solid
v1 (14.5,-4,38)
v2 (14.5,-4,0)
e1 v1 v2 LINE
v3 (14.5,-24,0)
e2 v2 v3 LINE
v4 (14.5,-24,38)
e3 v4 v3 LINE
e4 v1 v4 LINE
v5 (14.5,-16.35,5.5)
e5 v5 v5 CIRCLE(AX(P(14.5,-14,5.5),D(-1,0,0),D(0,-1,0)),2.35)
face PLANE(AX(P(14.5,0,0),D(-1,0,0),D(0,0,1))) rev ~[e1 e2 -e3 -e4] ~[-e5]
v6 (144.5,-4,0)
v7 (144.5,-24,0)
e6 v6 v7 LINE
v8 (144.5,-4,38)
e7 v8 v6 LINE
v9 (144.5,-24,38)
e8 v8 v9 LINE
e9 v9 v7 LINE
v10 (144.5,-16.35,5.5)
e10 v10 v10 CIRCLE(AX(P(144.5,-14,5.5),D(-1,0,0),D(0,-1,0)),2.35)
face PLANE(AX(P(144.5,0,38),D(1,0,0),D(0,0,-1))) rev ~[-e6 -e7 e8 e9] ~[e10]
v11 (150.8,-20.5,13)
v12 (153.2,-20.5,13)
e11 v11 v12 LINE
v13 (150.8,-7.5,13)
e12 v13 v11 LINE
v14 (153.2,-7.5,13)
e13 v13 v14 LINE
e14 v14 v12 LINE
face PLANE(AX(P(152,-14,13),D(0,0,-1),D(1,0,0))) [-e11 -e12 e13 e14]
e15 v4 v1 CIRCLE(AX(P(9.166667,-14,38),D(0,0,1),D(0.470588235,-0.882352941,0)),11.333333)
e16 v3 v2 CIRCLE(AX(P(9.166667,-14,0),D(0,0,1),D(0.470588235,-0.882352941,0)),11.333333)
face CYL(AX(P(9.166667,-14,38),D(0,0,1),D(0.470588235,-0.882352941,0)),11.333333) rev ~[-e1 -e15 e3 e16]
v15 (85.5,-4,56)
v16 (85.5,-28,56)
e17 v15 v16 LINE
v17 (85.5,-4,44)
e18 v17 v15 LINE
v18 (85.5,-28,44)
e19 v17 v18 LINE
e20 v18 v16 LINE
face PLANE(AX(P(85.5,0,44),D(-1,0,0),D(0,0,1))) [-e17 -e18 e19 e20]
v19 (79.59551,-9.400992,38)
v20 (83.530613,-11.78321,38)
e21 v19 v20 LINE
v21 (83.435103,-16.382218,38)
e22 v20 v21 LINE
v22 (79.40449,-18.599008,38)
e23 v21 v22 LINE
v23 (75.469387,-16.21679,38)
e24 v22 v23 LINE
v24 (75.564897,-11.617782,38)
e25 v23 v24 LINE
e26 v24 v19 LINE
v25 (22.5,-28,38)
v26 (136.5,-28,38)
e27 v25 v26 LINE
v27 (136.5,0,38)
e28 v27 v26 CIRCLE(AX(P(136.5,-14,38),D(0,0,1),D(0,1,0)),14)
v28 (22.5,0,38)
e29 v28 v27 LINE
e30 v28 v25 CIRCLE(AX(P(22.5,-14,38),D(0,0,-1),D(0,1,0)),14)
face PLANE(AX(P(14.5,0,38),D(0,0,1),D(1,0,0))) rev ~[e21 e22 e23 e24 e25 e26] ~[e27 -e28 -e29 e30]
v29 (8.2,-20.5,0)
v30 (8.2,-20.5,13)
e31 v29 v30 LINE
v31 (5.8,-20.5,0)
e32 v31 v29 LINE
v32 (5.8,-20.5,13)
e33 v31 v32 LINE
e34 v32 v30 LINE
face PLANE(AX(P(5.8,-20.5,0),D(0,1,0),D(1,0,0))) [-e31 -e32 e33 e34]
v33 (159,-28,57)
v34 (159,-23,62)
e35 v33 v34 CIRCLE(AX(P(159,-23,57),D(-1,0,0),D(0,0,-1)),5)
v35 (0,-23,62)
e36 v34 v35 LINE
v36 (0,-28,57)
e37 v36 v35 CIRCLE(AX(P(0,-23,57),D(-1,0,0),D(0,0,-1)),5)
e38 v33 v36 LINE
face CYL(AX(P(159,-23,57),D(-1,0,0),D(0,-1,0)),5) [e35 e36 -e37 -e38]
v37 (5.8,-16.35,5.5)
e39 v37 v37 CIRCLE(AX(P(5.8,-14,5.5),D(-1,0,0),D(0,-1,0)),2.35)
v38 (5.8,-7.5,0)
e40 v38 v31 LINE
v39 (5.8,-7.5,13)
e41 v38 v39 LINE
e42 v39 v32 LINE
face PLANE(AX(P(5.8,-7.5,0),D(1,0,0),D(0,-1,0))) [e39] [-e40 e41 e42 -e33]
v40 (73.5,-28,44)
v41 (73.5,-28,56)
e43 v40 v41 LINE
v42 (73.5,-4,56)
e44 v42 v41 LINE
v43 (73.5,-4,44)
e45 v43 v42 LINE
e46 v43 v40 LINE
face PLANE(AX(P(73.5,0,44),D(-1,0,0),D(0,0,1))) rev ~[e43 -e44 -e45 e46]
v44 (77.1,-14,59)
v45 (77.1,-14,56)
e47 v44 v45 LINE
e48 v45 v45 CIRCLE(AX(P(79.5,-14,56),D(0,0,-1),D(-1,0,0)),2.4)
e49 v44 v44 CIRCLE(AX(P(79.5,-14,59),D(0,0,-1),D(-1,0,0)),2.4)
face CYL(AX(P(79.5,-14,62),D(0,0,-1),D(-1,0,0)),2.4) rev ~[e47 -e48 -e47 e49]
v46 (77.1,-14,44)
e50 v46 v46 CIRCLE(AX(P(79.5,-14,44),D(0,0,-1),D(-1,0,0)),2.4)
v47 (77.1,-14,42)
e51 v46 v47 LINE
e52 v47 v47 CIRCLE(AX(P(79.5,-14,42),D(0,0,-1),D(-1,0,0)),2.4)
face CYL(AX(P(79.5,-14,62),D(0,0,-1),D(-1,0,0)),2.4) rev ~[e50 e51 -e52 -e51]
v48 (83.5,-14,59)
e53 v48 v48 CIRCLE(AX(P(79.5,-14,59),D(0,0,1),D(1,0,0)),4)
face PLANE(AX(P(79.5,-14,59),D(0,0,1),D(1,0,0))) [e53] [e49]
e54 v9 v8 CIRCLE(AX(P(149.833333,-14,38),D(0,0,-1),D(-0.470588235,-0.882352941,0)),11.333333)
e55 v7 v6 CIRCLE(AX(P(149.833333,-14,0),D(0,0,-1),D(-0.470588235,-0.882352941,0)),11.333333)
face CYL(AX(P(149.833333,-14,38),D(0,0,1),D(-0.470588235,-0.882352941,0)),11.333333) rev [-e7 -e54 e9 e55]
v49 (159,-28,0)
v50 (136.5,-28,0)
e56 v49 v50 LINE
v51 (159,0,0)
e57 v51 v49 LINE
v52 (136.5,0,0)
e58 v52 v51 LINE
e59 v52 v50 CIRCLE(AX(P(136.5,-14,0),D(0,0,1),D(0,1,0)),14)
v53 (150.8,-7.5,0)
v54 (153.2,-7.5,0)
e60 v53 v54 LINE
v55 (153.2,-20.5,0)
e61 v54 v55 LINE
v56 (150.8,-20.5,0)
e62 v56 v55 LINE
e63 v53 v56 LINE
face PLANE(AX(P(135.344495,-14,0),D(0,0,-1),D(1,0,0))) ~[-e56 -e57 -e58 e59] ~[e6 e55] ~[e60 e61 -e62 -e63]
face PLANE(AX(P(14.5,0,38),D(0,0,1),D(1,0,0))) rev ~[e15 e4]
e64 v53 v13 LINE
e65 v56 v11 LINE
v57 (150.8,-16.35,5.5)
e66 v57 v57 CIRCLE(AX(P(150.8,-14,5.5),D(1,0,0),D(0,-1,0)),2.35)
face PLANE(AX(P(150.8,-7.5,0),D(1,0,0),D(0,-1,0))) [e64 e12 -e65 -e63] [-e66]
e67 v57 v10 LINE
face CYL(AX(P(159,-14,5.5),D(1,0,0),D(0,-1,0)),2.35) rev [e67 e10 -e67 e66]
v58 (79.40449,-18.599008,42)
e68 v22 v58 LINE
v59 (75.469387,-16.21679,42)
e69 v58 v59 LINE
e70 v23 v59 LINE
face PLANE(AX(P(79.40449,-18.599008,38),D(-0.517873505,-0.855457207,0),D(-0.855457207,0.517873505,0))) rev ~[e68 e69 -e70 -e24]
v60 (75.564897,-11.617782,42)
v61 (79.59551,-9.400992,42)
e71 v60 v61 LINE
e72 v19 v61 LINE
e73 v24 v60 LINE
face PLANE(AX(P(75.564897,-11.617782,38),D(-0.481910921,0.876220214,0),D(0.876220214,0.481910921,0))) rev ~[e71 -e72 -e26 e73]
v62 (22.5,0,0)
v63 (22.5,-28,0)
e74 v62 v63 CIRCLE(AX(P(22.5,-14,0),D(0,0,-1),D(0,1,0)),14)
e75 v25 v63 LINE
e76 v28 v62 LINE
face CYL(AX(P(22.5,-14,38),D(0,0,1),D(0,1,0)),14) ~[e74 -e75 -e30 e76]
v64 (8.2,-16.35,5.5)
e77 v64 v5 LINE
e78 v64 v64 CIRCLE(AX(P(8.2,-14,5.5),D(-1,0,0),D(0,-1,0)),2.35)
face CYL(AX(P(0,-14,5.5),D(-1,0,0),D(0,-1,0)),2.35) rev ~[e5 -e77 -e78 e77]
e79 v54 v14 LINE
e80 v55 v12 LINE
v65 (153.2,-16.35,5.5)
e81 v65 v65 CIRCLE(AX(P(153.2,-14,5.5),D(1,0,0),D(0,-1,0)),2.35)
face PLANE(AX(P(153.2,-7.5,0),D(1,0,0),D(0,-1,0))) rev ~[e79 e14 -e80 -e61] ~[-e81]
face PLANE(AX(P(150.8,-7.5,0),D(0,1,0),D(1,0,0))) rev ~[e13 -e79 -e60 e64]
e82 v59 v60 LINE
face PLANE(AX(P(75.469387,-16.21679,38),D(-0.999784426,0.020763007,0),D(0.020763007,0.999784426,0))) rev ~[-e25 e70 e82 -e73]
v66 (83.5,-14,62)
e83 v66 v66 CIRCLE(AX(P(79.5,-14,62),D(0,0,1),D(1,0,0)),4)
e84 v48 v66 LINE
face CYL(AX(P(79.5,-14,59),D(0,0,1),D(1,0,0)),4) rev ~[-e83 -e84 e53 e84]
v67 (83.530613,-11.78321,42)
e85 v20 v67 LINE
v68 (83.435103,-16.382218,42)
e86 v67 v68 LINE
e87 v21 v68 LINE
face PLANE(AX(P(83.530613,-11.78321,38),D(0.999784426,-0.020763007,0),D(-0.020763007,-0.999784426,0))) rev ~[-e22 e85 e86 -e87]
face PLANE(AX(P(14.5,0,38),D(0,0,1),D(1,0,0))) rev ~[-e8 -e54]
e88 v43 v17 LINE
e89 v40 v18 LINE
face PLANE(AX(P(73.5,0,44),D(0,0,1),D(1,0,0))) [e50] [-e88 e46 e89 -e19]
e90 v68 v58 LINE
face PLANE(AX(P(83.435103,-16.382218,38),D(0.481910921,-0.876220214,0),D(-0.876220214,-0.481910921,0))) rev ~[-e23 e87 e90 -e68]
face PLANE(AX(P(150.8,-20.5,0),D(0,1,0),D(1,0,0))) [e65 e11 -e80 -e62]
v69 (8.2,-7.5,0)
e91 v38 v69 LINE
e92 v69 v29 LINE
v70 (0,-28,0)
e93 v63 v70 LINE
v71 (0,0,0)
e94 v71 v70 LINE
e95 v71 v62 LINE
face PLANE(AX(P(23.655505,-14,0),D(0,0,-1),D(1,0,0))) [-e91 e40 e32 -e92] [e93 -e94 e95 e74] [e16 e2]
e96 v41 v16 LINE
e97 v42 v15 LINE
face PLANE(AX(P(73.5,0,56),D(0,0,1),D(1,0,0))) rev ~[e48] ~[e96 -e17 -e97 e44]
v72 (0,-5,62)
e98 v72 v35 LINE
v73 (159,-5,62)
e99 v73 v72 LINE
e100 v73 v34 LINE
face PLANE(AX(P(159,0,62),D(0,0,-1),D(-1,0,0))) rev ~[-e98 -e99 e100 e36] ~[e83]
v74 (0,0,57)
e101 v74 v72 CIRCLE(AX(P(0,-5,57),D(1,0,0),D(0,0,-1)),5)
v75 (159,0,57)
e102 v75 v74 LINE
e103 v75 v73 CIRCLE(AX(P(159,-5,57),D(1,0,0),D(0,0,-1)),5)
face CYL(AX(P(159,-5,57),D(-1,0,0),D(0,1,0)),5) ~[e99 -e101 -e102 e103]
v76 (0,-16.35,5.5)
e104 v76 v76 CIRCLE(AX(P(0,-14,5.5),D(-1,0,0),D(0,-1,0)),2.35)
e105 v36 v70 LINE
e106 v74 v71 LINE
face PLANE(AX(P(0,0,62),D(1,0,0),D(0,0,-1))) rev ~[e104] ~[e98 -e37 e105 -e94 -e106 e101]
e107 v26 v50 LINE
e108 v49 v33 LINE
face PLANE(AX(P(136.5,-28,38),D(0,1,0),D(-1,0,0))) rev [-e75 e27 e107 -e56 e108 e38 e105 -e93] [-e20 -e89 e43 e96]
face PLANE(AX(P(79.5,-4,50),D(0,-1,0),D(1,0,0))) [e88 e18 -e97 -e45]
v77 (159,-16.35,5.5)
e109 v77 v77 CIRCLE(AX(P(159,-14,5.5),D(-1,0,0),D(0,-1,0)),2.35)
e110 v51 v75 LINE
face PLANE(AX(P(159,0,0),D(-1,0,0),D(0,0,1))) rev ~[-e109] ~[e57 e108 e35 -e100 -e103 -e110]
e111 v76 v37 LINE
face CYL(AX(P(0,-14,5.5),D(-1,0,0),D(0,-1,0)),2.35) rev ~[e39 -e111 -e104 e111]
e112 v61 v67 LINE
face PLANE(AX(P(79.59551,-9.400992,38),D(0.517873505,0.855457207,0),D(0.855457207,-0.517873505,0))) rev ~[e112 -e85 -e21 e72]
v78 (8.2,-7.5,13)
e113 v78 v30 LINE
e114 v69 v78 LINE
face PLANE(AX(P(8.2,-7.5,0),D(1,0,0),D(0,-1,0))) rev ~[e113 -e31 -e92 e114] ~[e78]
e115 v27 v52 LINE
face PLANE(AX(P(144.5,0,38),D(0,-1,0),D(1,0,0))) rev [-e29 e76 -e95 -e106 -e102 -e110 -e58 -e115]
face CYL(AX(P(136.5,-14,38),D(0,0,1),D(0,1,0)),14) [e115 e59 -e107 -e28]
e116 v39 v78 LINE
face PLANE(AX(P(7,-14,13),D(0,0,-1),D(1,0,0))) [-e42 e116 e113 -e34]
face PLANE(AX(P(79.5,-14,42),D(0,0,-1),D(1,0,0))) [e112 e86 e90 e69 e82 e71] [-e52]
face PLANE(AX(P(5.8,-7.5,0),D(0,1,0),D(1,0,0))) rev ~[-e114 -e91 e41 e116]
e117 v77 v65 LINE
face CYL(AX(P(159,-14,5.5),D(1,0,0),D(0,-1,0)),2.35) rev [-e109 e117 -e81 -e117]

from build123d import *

# Parameters (mm, degrees)
F0_W            = 12
F0_H            = 12
F1_DEPTH        = 28
F2_DEPTH        = 4
F3_W            = 2.4
F3_H            = 13
F4_DEPTH        = 13
F5_R            = 2.35
F6_DEPTH        = 14.5
F9_DEPTH        = 38
F11_D           = 4.8
F11_CBORE_D     = 8
F11_CBORE_DEPTH = 3
F12_DEPTH       = 4
F13_R           = 5


# Not quite as in the source:
# - a pattern or mirror of a feature is missing from the dataset's text; its kind, count and spacing are read off the source's solid


with BuildPart() as f1:
    # F0 (on Front) → F1 (new body)
    with BuildSketch(Plane.XZ):
        Polygon((0, 62), (0, 0), (14.5, 0), (14.5, 38), (144.5, 38), (144.5, 0), (159, 0), (159, 62), align=None)
        with Locations((79.5, 50)):
            Rectangle(F0_W, F0_H, mode=Mode.SUBTRACT)
    extrude(amount=F1_DEPTH)

    # F0 (on Front) → F2 (join)
    with BuildSketch(Plane.XZ):
        with Locations((79.5, 50)):
            Rectangle(F0_W, F0_H)
    extrude(amount=F2_DEPTH)

    # F3 (on face) → F4 (cut)
    with BuildSketch(Plane(origin=(0, 0, 0), x_dir=(1, 0, 0), z_dir=(0, 0, -1))):
        with Locations((7, 14)):
            Rectangle(F3_W, F3_H)
        with Locations((152, 14)):
            Rectangle(F3_W, F3_H)
    extrude(amount=-F4_DEPTH, mode=Mode.SUBTRACT)

    # F5 (on face) → F6 (cut)
    with BuildSketch(Plane(origin=(0, 0, 0), x_dir=(0, -1, 0), z_dir=(-1, 0, 0))):
        with Locations((14, 5.5)):
            Circle(F5_R)
    f6 = extrude(amount=-F6_DEPTH, mode=Mode.SUBTRACT)

    # F6_copies: F6 across plane
    add(f6.mirror(Plane(origin=(79.5, 0, 0), x_dir=(0, 0, 1), z_dir=(1, 0, 0))), mode=Mode.SUBTRACT)

    # F8 (on face) → F9 (join, through all)
    with BuildSketch(Plane(origin=(0, 0, 38), x_dir=(1, 0, 0), z_dir=(0, 0, -1))):
        with BuildLine():
            ThreePointArc((14.5, 24), (20.5, 14), (14.5, 4))
            Line((14.5, 4), (14.5, 0))
            Line((14.5, 0), (22.5, 0))
            ThreePointArc((22.5, 0), (36.5, 14), (22.5, 28))
            Line((22.5, 28), (14.5, 28))
            Line((14.5, 28), (14.5, 24))
        make_face()
    f9 = extrude(amount=F9_DEPTH)

    # F9_copies: F9 across plane
    add(f9.mirror(Plane(origin=(79.5, 0, 0), x_dir=(0, 0, 1), z_dir=(1, 0, 0))))

    # F11 (through all)
    with Locations(Plane.XY.offset(62)):
        with Locations((79.5, -14)):
            CounterBoreHole(F11_D / 2, F11_CBORE_D / 2, F11_CBORE_DEPTH)

    # F8 (on face) → F12 (cut)
    with BuildSketch(Plane(origin=(0, 0, 38), x_dir=(1, 0, 0), z_dir=(0, 0, -1))):
        Polygon((79.5955098336, 9.4009916426), (83.5306129865, 11.7832097635), (83.4351031529, 16.3822181209), (79.4044901664, 18.5990083574), (75.4693870135, 16.2167902365), (75.5648968471, 11.6177818791), align=None)
    extrude(amount=-F12_DEPTH, mode=Mode.SUBTRACT)

    # F13
    f13_edges = [f1.edges().sort_by_distance(p)[0] for p in [
        (79.5, -28, 62),
        (79.5, 0, 62),
    ]]
    fillet(f13_edges, radius=F13_R)


solid = f1.part
